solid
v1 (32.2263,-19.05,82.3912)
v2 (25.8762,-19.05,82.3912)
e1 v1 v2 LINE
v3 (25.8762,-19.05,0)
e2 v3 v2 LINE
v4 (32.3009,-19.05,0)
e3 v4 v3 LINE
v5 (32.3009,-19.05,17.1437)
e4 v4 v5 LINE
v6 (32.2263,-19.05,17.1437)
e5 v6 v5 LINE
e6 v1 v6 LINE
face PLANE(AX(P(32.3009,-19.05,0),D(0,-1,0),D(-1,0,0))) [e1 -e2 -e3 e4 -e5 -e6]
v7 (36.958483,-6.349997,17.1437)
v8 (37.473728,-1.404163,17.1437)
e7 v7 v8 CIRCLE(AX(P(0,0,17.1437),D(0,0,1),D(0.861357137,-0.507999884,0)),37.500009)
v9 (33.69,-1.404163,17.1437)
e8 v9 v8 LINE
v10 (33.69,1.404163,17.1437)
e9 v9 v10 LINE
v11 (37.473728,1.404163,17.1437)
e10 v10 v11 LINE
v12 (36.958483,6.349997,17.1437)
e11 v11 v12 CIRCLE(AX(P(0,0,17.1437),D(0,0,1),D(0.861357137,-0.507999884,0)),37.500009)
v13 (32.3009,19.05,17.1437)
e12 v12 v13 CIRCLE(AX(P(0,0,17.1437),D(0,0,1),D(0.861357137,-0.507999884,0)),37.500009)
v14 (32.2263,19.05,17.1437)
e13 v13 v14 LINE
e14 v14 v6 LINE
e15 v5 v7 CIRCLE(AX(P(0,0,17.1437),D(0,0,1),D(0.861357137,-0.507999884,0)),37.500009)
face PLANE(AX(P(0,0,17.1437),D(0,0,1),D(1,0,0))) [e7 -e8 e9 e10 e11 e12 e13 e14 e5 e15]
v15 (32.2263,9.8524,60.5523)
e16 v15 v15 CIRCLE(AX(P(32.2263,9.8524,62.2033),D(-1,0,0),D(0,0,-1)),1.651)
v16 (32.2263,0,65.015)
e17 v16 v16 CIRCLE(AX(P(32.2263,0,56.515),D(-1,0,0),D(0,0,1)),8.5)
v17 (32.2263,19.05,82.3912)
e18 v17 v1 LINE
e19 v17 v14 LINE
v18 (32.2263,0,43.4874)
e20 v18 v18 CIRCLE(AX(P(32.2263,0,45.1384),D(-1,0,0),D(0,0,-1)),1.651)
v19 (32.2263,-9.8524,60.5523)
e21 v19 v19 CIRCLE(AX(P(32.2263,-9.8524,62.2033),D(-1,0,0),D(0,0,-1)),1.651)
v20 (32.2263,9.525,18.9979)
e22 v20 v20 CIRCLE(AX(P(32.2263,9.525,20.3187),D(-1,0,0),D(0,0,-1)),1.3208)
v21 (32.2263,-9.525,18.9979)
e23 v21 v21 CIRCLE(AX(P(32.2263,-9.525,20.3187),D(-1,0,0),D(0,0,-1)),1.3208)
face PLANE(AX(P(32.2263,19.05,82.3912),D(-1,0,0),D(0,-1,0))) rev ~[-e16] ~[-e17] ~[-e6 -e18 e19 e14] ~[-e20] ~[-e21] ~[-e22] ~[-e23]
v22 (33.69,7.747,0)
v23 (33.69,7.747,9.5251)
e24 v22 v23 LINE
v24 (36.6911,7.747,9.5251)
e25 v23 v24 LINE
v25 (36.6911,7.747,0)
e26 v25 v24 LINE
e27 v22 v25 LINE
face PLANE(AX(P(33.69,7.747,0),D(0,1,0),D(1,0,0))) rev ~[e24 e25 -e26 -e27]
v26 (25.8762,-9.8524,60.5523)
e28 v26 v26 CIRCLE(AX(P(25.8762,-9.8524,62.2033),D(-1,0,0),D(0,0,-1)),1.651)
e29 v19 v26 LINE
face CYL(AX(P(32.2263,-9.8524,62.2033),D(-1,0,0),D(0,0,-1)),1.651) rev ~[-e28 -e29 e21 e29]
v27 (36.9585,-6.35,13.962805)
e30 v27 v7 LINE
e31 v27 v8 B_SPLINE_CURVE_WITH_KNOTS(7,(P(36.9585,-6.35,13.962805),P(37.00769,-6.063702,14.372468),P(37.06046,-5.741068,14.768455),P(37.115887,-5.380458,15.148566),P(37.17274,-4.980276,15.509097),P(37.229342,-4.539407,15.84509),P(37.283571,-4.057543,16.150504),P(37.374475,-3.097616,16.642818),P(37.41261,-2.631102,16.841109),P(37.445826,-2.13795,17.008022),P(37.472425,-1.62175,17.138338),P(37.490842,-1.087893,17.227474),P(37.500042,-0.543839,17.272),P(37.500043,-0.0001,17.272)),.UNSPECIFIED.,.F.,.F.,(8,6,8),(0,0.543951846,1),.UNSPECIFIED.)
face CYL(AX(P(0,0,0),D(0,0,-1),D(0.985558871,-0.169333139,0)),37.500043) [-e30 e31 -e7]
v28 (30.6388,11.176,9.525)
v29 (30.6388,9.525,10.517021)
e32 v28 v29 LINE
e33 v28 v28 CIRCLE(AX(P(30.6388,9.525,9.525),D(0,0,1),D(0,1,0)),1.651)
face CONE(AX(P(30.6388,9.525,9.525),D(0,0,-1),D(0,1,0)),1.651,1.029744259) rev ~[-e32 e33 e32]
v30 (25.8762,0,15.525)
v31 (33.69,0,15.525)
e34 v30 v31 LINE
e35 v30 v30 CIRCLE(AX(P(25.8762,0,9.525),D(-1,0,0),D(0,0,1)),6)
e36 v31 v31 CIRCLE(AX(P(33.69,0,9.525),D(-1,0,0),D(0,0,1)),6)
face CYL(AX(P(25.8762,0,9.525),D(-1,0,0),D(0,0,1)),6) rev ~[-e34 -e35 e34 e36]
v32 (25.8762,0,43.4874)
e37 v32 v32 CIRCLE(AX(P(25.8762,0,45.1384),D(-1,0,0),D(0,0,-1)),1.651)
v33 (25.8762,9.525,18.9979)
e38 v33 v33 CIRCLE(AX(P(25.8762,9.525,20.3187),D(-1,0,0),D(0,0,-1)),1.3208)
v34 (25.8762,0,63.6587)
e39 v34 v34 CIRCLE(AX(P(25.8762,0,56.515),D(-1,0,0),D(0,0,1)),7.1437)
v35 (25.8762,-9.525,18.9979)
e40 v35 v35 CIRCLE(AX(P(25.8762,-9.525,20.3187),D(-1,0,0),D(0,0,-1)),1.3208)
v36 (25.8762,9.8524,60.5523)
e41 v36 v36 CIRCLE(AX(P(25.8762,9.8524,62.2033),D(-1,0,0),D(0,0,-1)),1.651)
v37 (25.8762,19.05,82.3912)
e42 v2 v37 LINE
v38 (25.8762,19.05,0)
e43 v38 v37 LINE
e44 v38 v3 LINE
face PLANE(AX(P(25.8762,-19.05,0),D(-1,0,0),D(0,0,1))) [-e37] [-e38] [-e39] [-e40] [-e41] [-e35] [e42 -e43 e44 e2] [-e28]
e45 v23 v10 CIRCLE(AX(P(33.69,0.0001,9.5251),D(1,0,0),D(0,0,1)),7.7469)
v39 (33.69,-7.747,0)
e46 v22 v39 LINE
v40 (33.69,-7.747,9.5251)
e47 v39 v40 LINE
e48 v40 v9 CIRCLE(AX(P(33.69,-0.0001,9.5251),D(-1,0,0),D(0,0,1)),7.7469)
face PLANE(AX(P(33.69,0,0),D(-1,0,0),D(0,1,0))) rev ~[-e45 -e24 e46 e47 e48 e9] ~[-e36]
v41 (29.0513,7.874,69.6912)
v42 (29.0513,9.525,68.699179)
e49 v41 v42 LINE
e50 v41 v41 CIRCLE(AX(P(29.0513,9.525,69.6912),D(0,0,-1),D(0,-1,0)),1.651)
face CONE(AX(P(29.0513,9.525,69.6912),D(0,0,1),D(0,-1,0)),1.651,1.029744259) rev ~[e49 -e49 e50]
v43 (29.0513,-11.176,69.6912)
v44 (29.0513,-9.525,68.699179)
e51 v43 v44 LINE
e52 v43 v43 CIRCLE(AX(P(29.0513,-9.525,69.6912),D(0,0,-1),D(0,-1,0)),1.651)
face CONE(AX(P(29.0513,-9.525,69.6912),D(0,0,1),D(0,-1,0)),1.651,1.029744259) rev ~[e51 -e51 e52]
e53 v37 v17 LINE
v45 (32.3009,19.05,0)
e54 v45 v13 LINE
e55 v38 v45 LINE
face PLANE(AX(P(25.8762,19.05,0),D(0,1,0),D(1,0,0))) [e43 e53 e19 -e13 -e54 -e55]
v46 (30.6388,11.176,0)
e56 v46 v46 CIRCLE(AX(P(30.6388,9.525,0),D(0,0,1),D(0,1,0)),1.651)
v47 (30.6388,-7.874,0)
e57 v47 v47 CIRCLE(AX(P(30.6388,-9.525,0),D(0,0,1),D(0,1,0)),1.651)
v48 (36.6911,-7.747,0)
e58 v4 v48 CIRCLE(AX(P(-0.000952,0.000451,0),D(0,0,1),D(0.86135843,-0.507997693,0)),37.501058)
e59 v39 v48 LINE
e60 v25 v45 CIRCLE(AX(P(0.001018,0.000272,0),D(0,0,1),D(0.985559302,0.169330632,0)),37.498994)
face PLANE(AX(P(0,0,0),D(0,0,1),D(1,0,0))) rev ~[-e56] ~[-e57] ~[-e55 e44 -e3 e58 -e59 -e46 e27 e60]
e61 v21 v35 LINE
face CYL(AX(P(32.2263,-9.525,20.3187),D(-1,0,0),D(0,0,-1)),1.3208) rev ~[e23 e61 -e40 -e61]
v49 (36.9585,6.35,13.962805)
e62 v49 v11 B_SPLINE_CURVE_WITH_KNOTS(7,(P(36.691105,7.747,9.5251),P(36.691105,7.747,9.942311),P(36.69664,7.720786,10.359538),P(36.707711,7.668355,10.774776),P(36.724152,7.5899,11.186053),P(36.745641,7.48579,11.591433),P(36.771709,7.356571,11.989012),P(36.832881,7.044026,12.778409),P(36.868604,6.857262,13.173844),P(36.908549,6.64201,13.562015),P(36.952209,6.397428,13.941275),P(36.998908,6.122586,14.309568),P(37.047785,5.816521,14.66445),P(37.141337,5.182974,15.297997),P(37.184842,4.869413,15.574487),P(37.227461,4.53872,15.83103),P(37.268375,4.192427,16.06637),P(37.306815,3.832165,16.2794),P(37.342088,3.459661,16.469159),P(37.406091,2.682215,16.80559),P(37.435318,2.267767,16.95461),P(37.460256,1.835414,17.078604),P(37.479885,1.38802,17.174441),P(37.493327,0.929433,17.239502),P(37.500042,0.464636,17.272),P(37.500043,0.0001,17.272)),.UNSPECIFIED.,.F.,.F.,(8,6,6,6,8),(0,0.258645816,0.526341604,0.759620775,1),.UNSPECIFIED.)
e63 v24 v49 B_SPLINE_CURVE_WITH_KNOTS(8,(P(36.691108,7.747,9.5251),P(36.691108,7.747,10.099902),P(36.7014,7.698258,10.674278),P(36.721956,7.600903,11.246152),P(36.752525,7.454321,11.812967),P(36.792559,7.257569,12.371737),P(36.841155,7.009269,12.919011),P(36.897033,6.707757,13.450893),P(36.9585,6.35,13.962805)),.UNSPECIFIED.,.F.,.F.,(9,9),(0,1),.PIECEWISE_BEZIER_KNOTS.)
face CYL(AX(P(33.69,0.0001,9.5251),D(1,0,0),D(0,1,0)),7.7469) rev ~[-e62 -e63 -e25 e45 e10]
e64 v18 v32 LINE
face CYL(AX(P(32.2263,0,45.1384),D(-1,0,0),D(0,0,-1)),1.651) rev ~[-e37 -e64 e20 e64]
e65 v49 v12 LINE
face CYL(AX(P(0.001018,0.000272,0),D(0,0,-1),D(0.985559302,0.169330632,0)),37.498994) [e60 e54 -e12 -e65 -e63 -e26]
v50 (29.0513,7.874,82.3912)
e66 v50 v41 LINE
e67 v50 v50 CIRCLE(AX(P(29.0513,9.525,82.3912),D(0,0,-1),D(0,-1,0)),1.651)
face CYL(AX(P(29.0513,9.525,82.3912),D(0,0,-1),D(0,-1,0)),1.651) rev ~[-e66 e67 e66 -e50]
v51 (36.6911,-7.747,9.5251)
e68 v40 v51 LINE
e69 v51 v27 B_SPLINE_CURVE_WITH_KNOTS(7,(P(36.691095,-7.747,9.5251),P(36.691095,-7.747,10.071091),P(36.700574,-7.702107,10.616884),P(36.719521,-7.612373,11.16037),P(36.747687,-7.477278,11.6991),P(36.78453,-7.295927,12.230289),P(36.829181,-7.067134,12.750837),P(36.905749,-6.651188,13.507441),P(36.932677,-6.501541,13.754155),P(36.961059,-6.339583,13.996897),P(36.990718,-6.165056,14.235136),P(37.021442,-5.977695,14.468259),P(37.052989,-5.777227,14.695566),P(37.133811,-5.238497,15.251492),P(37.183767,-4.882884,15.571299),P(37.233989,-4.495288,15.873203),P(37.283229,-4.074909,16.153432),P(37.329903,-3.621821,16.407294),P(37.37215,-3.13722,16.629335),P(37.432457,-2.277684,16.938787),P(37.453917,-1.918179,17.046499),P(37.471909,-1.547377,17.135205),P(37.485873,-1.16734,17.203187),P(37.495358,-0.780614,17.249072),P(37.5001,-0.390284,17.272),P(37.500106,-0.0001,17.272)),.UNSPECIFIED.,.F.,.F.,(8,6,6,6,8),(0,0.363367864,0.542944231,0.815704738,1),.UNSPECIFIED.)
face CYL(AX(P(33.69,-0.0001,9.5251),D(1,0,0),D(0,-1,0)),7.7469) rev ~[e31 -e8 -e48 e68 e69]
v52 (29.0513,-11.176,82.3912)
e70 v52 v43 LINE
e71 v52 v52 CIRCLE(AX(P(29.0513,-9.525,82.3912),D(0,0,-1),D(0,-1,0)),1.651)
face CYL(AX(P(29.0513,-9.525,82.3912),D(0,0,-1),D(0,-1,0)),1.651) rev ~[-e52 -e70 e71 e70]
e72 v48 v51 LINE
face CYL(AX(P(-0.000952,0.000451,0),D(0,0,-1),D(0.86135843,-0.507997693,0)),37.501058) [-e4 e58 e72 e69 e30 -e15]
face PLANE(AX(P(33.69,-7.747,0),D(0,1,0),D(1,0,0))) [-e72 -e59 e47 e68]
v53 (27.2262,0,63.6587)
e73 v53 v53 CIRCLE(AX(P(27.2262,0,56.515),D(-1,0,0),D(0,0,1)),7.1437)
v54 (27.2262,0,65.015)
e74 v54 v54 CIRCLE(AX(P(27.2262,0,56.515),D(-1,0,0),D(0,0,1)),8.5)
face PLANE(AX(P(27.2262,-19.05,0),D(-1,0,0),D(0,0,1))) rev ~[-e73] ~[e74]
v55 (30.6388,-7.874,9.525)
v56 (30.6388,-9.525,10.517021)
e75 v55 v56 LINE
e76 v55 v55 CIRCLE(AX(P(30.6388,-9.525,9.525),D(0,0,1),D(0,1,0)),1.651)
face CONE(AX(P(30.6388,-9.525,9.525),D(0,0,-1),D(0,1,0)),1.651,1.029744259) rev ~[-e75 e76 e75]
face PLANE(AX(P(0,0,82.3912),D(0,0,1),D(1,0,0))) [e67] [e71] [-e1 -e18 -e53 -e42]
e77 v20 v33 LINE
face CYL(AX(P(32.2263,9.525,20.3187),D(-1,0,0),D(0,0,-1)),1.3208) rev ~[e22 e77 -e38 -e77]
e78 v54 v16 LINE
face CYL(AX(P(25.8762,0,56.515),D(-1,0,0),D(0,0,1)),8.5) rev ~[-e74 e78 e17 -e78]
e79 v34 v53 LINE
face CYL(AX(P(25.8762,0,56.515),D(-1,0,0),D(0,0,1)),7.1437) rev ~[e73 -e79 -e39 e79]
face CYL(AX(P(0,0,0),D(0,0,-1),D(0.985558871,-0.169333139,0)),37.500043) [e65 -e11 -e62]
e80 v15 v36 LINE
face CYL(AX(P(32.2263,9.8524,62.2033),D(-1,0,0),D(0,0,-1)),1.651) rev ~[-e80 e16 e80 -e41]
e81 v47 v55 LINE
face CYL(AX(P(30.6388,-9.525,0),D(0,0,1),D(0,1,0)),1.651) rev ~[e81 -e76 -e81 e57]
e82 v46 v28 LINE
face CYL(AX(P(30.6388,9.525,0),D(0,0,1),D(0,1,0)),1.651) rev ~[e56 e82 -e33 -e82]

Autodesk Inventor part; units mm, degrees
ref_plane "YZ Plane" through (0, 0, 0) normal (1, 0, 0) x (0, 1, 0)
ref_plane "XZ Plane" through (0, 0, 0) normal (0, 1, 0) x (-1, 0, 0)
ref_plane "XY Plane" through (0, 0, 0) normal (0, 0, 1) x (1, 0, 0)
sketch "Sketch1" plane through (0, 0, 0) normal (0, 0, 1) x (1, 0, 0)
  arc A0 (32.3009, 19.05) -> (32.3009, -19.05) centre (0, 0) ccw construction
  line L0 (0, 0) -> (25.8762, 0) construction
  line L1 (25.8762, 0) -> (25.8762, 19.05)
  line L2 (25.8762, 19.05) -> (32.3009, 19.05)
  line L3 (38.5763, 19.05) -> (38.5763, -19.05) construction
  line L4 (38.5763, -19.05) -> (32.3009, -19.05) construction
  line L5 (25.8762, -19.05) -> (25.8762, 0)
  line L6 (32.3009, 19.05) -> (38.5763, 19.05) construction
  line L7 (32.3009, -19.05) -> (25.8762, -19.05)
  arc A1 (32.3009, -19.05) -> (36.9585, -6.35) centre (0, 0) ccw
  line L8 (30.6388, 19.05) -> (30.6388, -19.05) construction
  line L9 (25.8762, 6.35) -> (36.9585, 6.35) construction
  line L10 (25.8762, -6.35) -> (36.9585, -6.35) construction
  arc A2 (36.9585, 6.35) -> (32.3009, 19.05) centre (0, 0) ccw
  arc A3 (36.9585, -6.35) -> (36.9585, 6.35) centre (0, 0) ccw
  line L11 (36.9585, 6.35) -> (36.9585, -6.35) construction
  point P0 (30.6388, 9.525)
  point P1 (30.6388, -9.525)
  dimension "d0" = 75
  dimension "d1" = 25.8762
  dimension "d2" = 19.05
  dimension "d3" = 19.05
  dimension "d4" = 12.7
  dimension "d5" = 4.7625
  dimension "d6" = 19.05
  dimension "d7" = 9.525
  dimension "d8" = 9.525
  dimension "d9" = 12.7
  dimension "d10" = 6.35
extrude "Extrusion1" add sketch "Sketch1" along normal blind 82.3912
hole "Hole1" at (30.6388, 9.525, 0) at (30.6388, -9.525, 0) direction (0, 0, 1) diameter 3.302 depth 9.525 tip angle 118 thread size "8-32 UNC" class "2B" standard "ANSI Unified Screw Threads"
sketch "Sketch2" plane through (25.8762, -19.05, 0) normal (-1, 0, 0) x (0, 0, 1)
  line L0 (0, 38.1) -> (82.3912, 38.1) projected
  line L1 (0, 19.05) -> (9.525, 19.05) construction
  circle A0 centre (9.525, 19.05) radius 6
  line L2 (82.3912, 38.1) -> (82.3912, 0) projected
  line L3 (9.525, 19.05) -> (56.515, 19.05) construction
  circle A1 centre (56.515, 19.05) radius 8.5
  circle A2 centre (9.525, 19.05) radius 25.4
  circle A3 centre (56.515, 19.05) radius 21.59
  circle A4 centre (56.515, 19.05) radius 7.1437
  dimension "d20" = 9.525
  dimension "d21" = 12
  dimension "d24" = 17
  dimension "d52" = 50.8
  dimension "d53" = 43.18
  dimension "d55" = 14.2875
extrude "Extrusion2" cut sketch "Sketch2" against normal through all contours A0 | A4
sketch "Sketch3" plane through (0, 0, 0) normal (0, 0, -1) x (-1, 0, 0)
  line L0 (-25.8762, -19.05) -> (-25.8762, 19.05) projected
  arc A0 (-32.3009, 19.05) -> (-32.3009, -19.05) centre (0, 0) ccw projected
  line L1 (-25.8762, 0) -> (-37.5, 0)
  line L2 (-33.69, 0) -> (-33.69, 7.747)
  line L3 (-33.69, 7.747) -> (-36.6911, 7.747)
  line L4 (-33.69, 0) -> (-33.69, -7.747)
  line L5 (-33.69, -7.747) -> (-36.6911, -7.747)
  line L6 (-37.5, 5.6093) -> (-37.5, -5.6093) construction
  dimension "d28" = 3.81
  dimension "d29" = 15.494
extrude "Extrusion3" cut sketch "Sketch3" against normal blind 17.272
fillet "Fillet1" radius 7.747 2 edges at (35.1905, -7.747, 17.272) (35.1905, 7.747, 17.272)
sketch "Sketch4" plane through (0, 0, 82.3912) normal (0, 0, 1) x (1, 0, 0)
  line L0 (25.8762, 19.05) -> (25.8762, -19.05) projected
  line L1 (25.8762, -19.05) -> (32.3009, -19.05) projected
  arc A0 (32.3009, -19.05) -> (32.3009, 19.05) centre (0, 0) ccw projected
  line L2 (32.3009, 19.05) -> (25.8762, 19.05) projected
  line L3 (32.2263, 19.05) -> (32.2263, -19.05)
  dimension "d33" = 6.35
extrude "Extrusion4" cut sketch "Sketch4" against normal blind 65.2475 contours L2 A0 L1 L3
sketch "Sketch5" plane through (32.2263, -19.05, 82.3912) normal (1, 0, 0) x (0, 0, -1)
  line L0 (65.2475, 0) -> (0, 0) projected
  line L1 (65.2475, 0) -> (65.2475, 38.1) projected
  line L2 (0, 38.1) -> (65.2475, 38.1) projected
  line L3 (58.8975, 38.1) -> (58.8975, 0)
  line L4 (62.0725, 38.1) -> (62.0725, 0)
  line L5 (58.8975, 19.05) -> (65.2475, 19.05)
  point P0 (82.3912, 19.05)
  point P1 (62.0725, 28.575)
  point P2 (62.0725, 9.525)
  dimension "d36" = 6.35
  dimension "d37" = 19.05
  dimension "d38" = 9.525
hole "Hole2" at (32.2263, 9.525, 20.3187) at (32.2263, -9.525, 20.3187) direction (-1, 0, 0) diameter 2.6416 end through all thread size "6-32 UNC" class "2B" standard "ANSI Unified Screw Threads"
extrude "Extrusion6" cut sketch "Sketch2" against normal through all contours A1
extrude "Extrusion7" add sketch "Sketch2" against normal blind 1.35 contours A1
sketch "Sketch7" plane through (0, 0, 82.3912) normal (0, 0, 1) x (1, 0, 0)
  line L0 (32.2263, -19.05) -> (32.2263, 19.05) projected
  line L1 (25.8762, 19.05) -> (25.8762, -19.05) projected
  line L2 (29.0512, 19.05) -> (29.0513, -19.05) construction
  line L3 (25.8762, 0) -> (32.2263, 0) construction
  line L4 (32.2263, 19.05) -> (25.8762, 19.05) projected
  point P0 (0, 0)
  point P1 (29.0513, 9.525)
  point P2 (29.0513, -9.525)
  dimension "d60" = 9.525
hole "Hole3" at (29.0513, 9.525, 82.3912) at (29.0513, -9.525, 82.3912) direction (0, 0, -1) diameter 3.302 depth 12.7 tip angle 118 thread size "8-32 UNC" class "2B" standard "ANSI Unified Screw Threads"
sketch "Sketch8" plane through (32.2263, -19.05, 82.3912) normal (1, 0, 0) x (0, 0, -1)
  circle A0 centre (25.8762, 19.05) radius 8.5 projected
  line L0 (0, 38.1) -> (65.2475, 38.1) projected
  circle A1 centre (25.8763, 19.05) radius 11.3766 construction
  line L1 (25.8763, 19.05) -> (37.2528, 19.05) construction
  line L2 (25.8763, 19.05) -> (20.188, 28.9024) construction
  line L3 (25.8763, 19.05) -> (20.188, 9.1976) construction
  circle A2 centre (37.2528, 19.05) radius 3.9688 construction
  circle A3 centre (37.2528, 19.05) radius 2.0828 construction
  point P0 (82.3912, 19.05)
  point P1 (35.17, 19.05)
  point P2 (34.3763, 19.05)
  point P3 (33.2841, 19.05)
  dimension "d70" = 7.9375
  dimension "d71" = 4.1656
  dimension "d68" = 120
  dimension "d69" = 120
  dimension "d72" = 1.0922
  dimension "d73" = 0.7937
hole "Hole4" at (32.2263, 0, 45.1384) at (32.2263, -9.8524, 62.2033) at (32.2263, 9.8524, 62.2033) direction (-1, 0, 0) diameter 3.302 end through all thread size "8-32 UNC" class "2B" standard "ANSI Unified Screw Threads"
equation "\"d3\" = d2"
equation "\"d6\" = 2 * d7"
equation "\"d7\" = d8"
properties part number "Module Side Beam" material "Aluminum 6061"
